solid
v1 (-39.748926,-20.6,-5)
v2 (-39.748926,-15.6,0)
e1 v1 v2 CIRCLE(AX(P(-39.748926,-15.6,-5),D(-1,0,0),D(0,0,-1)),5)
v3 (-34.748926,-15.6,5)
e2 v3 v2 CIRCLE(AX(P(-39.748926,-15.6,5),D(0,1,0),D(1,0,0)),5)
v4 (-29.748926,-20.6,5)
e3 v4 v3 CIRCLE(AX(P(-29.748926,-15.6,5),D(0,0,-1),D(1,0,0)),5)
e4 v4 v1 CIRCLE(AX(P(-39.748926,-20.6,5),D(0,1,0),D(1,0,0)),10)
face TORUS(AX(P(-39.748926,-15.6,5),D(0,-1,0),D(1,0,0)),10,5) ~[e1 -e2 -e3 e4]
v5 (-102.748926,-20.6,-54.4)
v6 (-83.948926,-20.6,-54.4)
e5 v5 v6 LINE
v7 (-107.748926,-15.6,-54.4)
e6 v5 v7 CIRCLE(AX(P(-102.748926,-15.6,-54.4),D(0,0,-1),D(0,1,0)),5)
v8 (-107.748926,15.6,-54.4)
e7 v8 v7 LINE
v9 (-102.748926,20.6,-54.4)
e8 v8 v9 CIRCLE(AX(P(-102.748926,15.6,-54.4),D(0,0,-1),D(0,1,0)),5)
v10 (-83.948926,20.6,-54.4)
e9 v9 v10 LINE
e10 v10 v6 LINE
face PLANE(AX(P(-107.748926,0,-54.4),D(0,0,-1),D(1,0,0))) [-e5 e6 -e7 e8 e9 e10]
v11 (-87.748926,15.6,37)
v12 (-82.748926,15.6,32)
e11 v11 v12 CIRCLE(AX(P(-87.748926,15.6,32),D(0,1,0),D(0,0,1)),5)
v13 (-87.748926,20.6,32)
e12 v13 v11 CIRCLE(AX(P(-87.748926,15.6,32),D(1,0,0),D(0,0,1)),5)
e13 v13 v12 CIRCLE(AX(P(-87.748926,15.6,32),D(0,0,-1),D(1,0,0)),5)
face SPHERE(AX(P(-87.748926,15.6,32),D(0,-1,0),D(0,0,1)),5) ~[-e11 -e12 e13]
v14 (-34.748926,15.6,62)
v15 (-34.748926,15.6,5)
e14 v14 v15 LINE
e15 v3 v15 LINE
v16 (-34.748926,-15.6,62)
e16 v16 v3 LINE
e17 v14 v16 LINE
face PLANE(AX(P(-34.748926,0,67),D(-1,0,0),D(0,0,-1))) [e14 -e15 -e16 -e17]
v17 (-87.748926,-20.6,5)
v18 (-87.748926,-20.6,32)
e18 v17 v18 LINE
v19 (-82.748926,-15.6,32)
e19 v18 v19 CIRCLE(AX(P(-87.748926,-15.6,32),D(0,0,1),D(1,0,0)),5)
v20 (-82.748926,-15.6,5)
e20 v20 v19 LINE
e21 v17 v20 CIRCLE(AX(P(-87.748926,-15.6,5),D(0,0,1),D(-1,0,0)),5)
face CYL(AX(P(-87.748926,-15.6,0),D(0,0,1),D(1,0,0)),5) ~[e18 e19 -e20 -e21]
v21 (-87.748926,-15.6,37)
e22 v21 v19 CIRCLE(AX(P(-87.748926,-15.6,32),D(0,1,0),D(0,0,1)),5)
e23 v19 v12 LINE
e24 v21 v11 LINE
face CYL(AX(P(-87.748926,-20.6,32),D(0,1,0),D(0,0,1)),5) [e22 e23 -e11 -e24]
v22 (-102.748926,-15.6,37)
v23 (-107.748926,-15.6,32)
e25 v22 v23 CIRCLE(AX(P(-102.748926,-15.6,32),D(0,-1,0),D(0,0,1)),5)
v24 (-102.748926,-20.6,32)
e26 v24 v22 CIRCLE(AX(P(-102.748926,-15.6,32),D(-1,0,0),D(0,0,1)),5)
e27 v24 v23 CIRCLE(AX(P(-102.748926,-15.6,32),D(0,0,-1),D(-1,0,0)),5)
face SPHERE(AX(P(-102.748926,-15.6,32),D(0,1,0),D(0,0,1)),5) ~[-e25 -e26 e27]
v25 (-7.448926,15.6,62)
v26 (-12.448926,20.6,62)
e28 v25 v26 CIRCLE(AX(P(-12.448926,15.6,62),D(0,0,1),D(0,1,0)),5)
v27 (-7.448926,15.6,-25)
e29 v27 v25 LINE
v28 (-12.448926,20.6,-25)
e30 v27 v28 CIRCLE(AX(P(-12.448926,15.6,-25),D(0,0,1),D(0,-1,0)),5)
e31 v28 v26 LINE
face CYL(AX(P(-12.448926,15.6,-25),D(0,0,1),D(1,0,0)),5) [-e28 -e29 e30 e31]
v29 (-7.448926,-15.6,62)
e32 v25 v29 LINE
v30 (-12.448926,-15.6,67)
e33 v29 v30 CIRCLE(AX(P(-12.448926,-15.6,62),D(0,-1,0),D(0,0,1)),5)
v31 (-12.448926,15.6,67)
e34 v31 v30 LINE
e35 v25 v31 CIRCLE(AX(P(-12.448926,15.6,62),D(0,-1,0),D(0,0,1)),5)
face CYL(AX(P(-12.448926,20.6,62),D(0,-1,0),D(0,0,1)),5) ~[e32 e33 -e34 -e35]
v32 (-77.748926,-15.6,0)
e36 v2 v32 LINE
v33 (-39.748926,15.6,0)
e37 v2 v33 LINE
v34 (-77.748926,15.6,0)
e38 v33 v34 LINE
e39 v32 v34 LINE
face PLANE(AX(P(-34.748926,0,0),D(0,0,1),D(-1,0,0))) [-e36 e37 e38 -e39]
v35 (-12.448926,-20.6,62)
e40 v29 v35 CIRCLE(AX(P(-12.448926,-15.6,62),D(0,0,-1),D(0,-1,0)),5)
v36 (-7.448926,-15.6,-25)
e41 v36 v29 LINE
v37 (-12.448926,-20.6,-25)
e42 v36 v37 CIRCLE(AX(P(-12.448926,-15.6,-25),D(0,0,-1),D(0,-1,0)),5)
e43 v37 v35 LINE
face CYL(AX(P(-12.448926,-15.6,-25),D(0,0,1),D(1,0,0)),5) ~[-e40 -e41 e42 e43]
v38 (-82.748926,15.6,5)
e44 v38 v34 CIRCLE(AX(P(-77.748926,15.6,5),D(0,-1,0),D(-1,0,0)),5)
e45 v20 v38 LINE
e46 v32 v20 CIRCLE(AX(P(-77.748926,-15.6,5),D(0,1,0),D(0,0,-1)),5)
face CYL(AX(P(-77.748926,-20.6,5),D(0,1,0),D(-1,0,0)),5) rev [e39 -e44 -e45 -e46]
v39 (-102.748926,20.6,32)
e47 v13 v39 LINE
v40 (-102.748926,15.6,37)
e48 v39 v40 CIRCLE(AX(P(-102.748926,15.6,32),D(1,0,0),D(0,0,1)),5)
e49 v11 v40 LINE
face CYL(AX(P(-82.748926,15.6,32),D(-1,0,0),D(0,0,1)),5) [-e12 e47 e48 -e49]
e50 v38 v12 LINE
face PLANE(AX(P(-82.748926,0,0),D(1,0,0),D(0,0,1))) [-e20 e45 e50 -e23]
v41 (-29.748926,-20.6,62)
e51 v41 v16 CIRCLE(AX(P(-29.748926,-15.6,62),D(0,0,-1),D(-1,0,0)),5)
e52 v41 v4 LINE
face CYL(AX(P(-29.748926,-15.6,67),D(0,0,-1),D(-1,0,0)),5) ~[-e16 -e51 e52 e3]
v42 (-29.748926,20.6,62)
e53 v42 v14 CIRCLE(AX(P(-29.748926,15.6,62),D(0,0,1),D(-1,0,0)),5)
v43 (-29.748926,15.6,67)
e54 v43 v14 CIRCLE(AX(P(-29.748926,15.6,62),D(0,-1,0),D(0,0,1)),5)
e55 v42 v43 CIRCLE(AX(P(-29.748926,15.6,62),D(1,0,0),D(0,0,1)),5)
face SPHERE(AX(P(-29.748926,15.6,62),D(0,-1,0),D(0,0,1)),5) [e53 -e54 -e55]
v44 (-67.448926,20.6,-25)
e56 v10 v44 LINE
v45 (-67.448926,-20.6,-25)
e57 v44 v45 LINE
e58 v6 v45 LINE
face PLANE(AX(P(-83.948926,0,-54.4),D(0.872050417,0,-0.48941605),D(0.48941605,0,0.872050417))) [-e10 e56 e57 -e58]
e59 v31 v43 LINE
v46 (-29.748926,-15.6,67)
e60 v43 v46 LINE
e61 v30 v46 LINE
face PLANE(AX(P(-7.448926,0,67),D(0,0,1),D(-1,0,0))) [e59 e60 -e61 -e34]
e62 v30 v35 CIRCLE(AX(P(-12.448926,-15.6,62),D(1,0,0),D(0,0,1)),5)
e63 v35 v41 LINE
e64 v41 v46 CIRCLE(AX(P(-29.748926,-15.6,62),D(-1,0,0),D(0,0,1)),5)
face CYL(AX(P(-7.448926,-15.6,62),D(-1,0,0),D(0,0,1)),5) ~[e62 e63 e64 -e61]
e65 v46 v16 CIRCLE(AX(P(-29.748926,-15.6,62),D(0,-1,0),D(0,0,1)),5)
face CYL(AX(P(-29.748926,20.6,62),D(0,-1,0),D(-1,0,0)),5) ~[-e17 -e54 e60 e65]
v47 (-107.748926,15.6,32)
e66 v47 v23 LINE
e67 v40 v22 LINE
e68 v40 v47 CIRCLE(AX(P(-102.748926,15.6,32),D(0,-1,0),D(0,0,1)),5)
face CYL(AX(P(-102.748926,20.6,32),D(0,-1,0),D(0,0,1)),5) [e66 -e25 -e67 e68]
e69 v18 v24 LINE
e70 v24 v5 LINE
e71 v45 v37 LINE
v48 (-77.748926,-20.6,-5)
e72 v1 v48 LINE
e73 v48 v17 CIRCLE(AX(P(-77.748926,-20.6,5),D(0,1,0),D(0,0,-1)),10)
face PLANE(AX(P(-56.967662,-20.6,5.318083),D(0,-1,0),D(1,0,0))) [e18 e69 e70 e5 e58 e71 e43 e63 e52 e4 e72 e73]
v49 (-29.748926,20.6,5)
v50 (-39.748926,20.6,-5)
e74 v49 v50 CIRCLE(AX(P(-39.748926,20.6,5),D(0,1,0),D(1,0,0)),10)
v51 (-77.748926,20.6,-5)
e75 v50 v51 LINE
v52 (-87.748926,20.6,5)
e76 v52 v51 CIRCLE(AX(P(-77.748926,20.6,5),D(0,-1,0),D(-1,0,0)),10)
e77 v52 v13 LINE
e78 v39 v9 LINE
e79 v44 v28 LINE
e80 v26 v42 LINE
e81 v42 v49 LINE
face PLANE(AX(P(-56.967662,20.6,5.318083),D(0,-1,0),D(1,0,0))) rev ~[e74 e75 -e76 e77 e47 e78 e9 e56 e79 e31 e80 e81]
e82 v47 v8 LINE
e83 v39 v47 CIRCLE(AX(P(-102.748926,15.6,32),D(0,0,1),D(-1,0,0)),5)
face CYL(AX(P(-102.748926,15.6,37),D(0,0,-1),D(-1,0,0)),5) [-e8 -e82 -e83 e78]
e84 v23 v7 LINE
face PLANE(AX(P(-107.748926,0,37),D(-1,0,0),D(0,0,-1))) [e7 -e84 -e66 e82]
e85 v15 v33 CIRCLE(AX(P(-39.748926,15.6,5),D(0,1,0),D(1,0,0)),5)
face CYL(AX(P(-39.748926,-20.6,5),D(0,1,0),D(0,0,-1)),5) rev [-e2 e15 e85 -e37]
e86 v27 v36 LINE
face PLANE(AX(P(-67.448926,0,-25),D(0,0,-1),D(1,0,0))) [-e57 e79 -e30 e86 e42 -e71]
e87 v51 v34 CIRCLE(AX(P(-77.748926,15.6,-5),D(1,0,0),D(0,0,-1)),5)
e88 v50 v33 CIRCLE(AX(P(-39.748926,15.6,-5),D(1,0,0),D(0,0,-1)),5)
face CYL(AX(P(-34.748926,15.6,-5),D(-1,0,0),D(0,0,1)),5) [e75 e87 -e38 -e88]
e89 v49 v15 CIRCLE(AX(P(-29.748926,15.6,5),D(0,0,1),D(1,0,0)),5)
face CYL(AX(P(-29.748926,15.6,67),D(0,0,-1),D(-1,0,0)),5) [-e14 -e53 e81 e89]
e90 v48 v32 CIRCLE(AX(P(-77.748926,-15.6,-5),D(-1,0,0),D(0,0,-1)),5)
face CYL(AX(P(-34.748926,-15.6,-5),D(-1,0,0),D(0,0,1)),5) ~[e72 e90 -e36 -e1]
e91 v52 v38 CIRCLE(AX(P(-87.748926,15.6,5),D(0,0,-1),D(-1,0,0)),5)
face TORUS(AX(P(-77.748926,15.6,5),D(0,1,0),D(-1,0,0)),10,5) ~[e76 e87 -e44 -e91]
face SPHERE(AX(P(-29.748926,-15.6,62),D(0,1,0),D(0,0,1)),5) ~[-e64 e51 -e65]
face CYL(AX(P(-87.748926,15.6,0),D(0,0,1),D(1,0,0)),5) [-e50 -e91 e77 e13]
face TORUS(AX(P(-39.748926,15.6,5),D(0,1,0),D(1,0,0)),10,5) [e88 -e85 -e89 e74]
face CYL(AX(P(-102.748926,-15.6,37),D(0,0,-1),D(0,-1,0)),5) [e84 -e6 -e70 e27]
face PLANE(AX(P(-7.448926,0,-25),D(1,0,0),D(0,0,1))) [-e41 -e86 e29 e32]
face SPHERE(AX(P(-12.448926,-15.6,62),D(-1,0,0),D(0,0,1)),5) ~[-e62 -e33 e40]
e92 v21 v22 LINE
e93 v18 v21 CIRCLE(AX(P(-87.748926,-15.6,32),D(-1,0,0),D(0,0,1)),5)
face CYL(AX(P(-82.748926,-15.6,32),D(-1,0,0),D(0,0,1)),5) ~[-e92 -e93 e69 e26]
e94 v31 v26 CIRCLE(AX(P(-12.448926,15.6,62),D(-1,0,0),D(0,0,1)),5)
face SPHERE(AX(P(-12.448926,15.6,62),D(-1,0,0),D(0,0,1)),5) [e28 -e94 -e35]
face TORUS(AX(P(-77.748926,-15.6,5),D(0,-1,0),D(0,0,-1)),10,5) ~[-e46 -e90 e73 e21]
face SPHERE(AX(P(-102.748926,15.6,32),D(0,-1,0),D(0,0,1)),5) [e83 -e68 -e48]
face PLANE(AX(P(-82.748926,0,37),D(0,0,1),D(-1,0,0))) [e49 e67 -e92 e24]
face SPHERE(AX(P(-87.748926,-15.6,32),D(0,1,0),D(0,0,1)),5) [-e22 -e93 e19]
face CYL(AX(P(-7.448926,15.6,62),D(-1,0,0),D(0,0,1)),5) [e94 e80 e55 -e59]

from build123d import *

# Parameters (mm, degrees)
F1_DEPTH = 20.6
F2_R     = 5


with BuildPart() as f1:
    # F0 (on Front) → F1 (new body, symmetric)
    with BuildSketch(Plane.XZ):
        Polygon((-82.7489259505, 37), (-107.7489259505, 37), (-107.7489259505, -54.4), (-83.9489259505, -54.4), (-67.4489259505, -25), (-7.4489259505, -25), (-7.4489259505, 67), (-34.7489259505, 67), (-34.7489259505, 0), (-82.7489259505, 0), align=None)
    extrude(amount=F1_DEPTH, both=True)

    # F2
    f2_edges = [f1.edges().sort_by_distance(p)[0] for p in [
        (-107.748926, 0, 37),
        (-82.748926, 0, 37),
        (-95.248926, -20.6, 37),
        (-95.248926, 20.6, 37),
        (-82.748926, -20.6, 18.5),
        (-82.748926, 0, 0),
        (-82.748926, 20.6, 18.5),
        (-58.748926, 20.6, 0),
        (-58.748926, -20.6, 0),
        (-34.748926, 0, 0),
        (-34.748926, 0, 67),
        (-21.098926, -20.6, 67),
        (-21.098926, 20.6, 67),
        (-7.448926, 0, 67),
        (-34.748926, -20.6, 33.5),
        (-7.448926, -20.6, 21),
        (-7.448926, 20.6, 21),
        (-107.748926, -20.6, -8.7),
        (-107.748926, 20.6, -8.7),
        (-34.748926, 20.6, 33.5),
    ]]
    fillet(f2_edges, radius=F2_R)


solid = f1.part
